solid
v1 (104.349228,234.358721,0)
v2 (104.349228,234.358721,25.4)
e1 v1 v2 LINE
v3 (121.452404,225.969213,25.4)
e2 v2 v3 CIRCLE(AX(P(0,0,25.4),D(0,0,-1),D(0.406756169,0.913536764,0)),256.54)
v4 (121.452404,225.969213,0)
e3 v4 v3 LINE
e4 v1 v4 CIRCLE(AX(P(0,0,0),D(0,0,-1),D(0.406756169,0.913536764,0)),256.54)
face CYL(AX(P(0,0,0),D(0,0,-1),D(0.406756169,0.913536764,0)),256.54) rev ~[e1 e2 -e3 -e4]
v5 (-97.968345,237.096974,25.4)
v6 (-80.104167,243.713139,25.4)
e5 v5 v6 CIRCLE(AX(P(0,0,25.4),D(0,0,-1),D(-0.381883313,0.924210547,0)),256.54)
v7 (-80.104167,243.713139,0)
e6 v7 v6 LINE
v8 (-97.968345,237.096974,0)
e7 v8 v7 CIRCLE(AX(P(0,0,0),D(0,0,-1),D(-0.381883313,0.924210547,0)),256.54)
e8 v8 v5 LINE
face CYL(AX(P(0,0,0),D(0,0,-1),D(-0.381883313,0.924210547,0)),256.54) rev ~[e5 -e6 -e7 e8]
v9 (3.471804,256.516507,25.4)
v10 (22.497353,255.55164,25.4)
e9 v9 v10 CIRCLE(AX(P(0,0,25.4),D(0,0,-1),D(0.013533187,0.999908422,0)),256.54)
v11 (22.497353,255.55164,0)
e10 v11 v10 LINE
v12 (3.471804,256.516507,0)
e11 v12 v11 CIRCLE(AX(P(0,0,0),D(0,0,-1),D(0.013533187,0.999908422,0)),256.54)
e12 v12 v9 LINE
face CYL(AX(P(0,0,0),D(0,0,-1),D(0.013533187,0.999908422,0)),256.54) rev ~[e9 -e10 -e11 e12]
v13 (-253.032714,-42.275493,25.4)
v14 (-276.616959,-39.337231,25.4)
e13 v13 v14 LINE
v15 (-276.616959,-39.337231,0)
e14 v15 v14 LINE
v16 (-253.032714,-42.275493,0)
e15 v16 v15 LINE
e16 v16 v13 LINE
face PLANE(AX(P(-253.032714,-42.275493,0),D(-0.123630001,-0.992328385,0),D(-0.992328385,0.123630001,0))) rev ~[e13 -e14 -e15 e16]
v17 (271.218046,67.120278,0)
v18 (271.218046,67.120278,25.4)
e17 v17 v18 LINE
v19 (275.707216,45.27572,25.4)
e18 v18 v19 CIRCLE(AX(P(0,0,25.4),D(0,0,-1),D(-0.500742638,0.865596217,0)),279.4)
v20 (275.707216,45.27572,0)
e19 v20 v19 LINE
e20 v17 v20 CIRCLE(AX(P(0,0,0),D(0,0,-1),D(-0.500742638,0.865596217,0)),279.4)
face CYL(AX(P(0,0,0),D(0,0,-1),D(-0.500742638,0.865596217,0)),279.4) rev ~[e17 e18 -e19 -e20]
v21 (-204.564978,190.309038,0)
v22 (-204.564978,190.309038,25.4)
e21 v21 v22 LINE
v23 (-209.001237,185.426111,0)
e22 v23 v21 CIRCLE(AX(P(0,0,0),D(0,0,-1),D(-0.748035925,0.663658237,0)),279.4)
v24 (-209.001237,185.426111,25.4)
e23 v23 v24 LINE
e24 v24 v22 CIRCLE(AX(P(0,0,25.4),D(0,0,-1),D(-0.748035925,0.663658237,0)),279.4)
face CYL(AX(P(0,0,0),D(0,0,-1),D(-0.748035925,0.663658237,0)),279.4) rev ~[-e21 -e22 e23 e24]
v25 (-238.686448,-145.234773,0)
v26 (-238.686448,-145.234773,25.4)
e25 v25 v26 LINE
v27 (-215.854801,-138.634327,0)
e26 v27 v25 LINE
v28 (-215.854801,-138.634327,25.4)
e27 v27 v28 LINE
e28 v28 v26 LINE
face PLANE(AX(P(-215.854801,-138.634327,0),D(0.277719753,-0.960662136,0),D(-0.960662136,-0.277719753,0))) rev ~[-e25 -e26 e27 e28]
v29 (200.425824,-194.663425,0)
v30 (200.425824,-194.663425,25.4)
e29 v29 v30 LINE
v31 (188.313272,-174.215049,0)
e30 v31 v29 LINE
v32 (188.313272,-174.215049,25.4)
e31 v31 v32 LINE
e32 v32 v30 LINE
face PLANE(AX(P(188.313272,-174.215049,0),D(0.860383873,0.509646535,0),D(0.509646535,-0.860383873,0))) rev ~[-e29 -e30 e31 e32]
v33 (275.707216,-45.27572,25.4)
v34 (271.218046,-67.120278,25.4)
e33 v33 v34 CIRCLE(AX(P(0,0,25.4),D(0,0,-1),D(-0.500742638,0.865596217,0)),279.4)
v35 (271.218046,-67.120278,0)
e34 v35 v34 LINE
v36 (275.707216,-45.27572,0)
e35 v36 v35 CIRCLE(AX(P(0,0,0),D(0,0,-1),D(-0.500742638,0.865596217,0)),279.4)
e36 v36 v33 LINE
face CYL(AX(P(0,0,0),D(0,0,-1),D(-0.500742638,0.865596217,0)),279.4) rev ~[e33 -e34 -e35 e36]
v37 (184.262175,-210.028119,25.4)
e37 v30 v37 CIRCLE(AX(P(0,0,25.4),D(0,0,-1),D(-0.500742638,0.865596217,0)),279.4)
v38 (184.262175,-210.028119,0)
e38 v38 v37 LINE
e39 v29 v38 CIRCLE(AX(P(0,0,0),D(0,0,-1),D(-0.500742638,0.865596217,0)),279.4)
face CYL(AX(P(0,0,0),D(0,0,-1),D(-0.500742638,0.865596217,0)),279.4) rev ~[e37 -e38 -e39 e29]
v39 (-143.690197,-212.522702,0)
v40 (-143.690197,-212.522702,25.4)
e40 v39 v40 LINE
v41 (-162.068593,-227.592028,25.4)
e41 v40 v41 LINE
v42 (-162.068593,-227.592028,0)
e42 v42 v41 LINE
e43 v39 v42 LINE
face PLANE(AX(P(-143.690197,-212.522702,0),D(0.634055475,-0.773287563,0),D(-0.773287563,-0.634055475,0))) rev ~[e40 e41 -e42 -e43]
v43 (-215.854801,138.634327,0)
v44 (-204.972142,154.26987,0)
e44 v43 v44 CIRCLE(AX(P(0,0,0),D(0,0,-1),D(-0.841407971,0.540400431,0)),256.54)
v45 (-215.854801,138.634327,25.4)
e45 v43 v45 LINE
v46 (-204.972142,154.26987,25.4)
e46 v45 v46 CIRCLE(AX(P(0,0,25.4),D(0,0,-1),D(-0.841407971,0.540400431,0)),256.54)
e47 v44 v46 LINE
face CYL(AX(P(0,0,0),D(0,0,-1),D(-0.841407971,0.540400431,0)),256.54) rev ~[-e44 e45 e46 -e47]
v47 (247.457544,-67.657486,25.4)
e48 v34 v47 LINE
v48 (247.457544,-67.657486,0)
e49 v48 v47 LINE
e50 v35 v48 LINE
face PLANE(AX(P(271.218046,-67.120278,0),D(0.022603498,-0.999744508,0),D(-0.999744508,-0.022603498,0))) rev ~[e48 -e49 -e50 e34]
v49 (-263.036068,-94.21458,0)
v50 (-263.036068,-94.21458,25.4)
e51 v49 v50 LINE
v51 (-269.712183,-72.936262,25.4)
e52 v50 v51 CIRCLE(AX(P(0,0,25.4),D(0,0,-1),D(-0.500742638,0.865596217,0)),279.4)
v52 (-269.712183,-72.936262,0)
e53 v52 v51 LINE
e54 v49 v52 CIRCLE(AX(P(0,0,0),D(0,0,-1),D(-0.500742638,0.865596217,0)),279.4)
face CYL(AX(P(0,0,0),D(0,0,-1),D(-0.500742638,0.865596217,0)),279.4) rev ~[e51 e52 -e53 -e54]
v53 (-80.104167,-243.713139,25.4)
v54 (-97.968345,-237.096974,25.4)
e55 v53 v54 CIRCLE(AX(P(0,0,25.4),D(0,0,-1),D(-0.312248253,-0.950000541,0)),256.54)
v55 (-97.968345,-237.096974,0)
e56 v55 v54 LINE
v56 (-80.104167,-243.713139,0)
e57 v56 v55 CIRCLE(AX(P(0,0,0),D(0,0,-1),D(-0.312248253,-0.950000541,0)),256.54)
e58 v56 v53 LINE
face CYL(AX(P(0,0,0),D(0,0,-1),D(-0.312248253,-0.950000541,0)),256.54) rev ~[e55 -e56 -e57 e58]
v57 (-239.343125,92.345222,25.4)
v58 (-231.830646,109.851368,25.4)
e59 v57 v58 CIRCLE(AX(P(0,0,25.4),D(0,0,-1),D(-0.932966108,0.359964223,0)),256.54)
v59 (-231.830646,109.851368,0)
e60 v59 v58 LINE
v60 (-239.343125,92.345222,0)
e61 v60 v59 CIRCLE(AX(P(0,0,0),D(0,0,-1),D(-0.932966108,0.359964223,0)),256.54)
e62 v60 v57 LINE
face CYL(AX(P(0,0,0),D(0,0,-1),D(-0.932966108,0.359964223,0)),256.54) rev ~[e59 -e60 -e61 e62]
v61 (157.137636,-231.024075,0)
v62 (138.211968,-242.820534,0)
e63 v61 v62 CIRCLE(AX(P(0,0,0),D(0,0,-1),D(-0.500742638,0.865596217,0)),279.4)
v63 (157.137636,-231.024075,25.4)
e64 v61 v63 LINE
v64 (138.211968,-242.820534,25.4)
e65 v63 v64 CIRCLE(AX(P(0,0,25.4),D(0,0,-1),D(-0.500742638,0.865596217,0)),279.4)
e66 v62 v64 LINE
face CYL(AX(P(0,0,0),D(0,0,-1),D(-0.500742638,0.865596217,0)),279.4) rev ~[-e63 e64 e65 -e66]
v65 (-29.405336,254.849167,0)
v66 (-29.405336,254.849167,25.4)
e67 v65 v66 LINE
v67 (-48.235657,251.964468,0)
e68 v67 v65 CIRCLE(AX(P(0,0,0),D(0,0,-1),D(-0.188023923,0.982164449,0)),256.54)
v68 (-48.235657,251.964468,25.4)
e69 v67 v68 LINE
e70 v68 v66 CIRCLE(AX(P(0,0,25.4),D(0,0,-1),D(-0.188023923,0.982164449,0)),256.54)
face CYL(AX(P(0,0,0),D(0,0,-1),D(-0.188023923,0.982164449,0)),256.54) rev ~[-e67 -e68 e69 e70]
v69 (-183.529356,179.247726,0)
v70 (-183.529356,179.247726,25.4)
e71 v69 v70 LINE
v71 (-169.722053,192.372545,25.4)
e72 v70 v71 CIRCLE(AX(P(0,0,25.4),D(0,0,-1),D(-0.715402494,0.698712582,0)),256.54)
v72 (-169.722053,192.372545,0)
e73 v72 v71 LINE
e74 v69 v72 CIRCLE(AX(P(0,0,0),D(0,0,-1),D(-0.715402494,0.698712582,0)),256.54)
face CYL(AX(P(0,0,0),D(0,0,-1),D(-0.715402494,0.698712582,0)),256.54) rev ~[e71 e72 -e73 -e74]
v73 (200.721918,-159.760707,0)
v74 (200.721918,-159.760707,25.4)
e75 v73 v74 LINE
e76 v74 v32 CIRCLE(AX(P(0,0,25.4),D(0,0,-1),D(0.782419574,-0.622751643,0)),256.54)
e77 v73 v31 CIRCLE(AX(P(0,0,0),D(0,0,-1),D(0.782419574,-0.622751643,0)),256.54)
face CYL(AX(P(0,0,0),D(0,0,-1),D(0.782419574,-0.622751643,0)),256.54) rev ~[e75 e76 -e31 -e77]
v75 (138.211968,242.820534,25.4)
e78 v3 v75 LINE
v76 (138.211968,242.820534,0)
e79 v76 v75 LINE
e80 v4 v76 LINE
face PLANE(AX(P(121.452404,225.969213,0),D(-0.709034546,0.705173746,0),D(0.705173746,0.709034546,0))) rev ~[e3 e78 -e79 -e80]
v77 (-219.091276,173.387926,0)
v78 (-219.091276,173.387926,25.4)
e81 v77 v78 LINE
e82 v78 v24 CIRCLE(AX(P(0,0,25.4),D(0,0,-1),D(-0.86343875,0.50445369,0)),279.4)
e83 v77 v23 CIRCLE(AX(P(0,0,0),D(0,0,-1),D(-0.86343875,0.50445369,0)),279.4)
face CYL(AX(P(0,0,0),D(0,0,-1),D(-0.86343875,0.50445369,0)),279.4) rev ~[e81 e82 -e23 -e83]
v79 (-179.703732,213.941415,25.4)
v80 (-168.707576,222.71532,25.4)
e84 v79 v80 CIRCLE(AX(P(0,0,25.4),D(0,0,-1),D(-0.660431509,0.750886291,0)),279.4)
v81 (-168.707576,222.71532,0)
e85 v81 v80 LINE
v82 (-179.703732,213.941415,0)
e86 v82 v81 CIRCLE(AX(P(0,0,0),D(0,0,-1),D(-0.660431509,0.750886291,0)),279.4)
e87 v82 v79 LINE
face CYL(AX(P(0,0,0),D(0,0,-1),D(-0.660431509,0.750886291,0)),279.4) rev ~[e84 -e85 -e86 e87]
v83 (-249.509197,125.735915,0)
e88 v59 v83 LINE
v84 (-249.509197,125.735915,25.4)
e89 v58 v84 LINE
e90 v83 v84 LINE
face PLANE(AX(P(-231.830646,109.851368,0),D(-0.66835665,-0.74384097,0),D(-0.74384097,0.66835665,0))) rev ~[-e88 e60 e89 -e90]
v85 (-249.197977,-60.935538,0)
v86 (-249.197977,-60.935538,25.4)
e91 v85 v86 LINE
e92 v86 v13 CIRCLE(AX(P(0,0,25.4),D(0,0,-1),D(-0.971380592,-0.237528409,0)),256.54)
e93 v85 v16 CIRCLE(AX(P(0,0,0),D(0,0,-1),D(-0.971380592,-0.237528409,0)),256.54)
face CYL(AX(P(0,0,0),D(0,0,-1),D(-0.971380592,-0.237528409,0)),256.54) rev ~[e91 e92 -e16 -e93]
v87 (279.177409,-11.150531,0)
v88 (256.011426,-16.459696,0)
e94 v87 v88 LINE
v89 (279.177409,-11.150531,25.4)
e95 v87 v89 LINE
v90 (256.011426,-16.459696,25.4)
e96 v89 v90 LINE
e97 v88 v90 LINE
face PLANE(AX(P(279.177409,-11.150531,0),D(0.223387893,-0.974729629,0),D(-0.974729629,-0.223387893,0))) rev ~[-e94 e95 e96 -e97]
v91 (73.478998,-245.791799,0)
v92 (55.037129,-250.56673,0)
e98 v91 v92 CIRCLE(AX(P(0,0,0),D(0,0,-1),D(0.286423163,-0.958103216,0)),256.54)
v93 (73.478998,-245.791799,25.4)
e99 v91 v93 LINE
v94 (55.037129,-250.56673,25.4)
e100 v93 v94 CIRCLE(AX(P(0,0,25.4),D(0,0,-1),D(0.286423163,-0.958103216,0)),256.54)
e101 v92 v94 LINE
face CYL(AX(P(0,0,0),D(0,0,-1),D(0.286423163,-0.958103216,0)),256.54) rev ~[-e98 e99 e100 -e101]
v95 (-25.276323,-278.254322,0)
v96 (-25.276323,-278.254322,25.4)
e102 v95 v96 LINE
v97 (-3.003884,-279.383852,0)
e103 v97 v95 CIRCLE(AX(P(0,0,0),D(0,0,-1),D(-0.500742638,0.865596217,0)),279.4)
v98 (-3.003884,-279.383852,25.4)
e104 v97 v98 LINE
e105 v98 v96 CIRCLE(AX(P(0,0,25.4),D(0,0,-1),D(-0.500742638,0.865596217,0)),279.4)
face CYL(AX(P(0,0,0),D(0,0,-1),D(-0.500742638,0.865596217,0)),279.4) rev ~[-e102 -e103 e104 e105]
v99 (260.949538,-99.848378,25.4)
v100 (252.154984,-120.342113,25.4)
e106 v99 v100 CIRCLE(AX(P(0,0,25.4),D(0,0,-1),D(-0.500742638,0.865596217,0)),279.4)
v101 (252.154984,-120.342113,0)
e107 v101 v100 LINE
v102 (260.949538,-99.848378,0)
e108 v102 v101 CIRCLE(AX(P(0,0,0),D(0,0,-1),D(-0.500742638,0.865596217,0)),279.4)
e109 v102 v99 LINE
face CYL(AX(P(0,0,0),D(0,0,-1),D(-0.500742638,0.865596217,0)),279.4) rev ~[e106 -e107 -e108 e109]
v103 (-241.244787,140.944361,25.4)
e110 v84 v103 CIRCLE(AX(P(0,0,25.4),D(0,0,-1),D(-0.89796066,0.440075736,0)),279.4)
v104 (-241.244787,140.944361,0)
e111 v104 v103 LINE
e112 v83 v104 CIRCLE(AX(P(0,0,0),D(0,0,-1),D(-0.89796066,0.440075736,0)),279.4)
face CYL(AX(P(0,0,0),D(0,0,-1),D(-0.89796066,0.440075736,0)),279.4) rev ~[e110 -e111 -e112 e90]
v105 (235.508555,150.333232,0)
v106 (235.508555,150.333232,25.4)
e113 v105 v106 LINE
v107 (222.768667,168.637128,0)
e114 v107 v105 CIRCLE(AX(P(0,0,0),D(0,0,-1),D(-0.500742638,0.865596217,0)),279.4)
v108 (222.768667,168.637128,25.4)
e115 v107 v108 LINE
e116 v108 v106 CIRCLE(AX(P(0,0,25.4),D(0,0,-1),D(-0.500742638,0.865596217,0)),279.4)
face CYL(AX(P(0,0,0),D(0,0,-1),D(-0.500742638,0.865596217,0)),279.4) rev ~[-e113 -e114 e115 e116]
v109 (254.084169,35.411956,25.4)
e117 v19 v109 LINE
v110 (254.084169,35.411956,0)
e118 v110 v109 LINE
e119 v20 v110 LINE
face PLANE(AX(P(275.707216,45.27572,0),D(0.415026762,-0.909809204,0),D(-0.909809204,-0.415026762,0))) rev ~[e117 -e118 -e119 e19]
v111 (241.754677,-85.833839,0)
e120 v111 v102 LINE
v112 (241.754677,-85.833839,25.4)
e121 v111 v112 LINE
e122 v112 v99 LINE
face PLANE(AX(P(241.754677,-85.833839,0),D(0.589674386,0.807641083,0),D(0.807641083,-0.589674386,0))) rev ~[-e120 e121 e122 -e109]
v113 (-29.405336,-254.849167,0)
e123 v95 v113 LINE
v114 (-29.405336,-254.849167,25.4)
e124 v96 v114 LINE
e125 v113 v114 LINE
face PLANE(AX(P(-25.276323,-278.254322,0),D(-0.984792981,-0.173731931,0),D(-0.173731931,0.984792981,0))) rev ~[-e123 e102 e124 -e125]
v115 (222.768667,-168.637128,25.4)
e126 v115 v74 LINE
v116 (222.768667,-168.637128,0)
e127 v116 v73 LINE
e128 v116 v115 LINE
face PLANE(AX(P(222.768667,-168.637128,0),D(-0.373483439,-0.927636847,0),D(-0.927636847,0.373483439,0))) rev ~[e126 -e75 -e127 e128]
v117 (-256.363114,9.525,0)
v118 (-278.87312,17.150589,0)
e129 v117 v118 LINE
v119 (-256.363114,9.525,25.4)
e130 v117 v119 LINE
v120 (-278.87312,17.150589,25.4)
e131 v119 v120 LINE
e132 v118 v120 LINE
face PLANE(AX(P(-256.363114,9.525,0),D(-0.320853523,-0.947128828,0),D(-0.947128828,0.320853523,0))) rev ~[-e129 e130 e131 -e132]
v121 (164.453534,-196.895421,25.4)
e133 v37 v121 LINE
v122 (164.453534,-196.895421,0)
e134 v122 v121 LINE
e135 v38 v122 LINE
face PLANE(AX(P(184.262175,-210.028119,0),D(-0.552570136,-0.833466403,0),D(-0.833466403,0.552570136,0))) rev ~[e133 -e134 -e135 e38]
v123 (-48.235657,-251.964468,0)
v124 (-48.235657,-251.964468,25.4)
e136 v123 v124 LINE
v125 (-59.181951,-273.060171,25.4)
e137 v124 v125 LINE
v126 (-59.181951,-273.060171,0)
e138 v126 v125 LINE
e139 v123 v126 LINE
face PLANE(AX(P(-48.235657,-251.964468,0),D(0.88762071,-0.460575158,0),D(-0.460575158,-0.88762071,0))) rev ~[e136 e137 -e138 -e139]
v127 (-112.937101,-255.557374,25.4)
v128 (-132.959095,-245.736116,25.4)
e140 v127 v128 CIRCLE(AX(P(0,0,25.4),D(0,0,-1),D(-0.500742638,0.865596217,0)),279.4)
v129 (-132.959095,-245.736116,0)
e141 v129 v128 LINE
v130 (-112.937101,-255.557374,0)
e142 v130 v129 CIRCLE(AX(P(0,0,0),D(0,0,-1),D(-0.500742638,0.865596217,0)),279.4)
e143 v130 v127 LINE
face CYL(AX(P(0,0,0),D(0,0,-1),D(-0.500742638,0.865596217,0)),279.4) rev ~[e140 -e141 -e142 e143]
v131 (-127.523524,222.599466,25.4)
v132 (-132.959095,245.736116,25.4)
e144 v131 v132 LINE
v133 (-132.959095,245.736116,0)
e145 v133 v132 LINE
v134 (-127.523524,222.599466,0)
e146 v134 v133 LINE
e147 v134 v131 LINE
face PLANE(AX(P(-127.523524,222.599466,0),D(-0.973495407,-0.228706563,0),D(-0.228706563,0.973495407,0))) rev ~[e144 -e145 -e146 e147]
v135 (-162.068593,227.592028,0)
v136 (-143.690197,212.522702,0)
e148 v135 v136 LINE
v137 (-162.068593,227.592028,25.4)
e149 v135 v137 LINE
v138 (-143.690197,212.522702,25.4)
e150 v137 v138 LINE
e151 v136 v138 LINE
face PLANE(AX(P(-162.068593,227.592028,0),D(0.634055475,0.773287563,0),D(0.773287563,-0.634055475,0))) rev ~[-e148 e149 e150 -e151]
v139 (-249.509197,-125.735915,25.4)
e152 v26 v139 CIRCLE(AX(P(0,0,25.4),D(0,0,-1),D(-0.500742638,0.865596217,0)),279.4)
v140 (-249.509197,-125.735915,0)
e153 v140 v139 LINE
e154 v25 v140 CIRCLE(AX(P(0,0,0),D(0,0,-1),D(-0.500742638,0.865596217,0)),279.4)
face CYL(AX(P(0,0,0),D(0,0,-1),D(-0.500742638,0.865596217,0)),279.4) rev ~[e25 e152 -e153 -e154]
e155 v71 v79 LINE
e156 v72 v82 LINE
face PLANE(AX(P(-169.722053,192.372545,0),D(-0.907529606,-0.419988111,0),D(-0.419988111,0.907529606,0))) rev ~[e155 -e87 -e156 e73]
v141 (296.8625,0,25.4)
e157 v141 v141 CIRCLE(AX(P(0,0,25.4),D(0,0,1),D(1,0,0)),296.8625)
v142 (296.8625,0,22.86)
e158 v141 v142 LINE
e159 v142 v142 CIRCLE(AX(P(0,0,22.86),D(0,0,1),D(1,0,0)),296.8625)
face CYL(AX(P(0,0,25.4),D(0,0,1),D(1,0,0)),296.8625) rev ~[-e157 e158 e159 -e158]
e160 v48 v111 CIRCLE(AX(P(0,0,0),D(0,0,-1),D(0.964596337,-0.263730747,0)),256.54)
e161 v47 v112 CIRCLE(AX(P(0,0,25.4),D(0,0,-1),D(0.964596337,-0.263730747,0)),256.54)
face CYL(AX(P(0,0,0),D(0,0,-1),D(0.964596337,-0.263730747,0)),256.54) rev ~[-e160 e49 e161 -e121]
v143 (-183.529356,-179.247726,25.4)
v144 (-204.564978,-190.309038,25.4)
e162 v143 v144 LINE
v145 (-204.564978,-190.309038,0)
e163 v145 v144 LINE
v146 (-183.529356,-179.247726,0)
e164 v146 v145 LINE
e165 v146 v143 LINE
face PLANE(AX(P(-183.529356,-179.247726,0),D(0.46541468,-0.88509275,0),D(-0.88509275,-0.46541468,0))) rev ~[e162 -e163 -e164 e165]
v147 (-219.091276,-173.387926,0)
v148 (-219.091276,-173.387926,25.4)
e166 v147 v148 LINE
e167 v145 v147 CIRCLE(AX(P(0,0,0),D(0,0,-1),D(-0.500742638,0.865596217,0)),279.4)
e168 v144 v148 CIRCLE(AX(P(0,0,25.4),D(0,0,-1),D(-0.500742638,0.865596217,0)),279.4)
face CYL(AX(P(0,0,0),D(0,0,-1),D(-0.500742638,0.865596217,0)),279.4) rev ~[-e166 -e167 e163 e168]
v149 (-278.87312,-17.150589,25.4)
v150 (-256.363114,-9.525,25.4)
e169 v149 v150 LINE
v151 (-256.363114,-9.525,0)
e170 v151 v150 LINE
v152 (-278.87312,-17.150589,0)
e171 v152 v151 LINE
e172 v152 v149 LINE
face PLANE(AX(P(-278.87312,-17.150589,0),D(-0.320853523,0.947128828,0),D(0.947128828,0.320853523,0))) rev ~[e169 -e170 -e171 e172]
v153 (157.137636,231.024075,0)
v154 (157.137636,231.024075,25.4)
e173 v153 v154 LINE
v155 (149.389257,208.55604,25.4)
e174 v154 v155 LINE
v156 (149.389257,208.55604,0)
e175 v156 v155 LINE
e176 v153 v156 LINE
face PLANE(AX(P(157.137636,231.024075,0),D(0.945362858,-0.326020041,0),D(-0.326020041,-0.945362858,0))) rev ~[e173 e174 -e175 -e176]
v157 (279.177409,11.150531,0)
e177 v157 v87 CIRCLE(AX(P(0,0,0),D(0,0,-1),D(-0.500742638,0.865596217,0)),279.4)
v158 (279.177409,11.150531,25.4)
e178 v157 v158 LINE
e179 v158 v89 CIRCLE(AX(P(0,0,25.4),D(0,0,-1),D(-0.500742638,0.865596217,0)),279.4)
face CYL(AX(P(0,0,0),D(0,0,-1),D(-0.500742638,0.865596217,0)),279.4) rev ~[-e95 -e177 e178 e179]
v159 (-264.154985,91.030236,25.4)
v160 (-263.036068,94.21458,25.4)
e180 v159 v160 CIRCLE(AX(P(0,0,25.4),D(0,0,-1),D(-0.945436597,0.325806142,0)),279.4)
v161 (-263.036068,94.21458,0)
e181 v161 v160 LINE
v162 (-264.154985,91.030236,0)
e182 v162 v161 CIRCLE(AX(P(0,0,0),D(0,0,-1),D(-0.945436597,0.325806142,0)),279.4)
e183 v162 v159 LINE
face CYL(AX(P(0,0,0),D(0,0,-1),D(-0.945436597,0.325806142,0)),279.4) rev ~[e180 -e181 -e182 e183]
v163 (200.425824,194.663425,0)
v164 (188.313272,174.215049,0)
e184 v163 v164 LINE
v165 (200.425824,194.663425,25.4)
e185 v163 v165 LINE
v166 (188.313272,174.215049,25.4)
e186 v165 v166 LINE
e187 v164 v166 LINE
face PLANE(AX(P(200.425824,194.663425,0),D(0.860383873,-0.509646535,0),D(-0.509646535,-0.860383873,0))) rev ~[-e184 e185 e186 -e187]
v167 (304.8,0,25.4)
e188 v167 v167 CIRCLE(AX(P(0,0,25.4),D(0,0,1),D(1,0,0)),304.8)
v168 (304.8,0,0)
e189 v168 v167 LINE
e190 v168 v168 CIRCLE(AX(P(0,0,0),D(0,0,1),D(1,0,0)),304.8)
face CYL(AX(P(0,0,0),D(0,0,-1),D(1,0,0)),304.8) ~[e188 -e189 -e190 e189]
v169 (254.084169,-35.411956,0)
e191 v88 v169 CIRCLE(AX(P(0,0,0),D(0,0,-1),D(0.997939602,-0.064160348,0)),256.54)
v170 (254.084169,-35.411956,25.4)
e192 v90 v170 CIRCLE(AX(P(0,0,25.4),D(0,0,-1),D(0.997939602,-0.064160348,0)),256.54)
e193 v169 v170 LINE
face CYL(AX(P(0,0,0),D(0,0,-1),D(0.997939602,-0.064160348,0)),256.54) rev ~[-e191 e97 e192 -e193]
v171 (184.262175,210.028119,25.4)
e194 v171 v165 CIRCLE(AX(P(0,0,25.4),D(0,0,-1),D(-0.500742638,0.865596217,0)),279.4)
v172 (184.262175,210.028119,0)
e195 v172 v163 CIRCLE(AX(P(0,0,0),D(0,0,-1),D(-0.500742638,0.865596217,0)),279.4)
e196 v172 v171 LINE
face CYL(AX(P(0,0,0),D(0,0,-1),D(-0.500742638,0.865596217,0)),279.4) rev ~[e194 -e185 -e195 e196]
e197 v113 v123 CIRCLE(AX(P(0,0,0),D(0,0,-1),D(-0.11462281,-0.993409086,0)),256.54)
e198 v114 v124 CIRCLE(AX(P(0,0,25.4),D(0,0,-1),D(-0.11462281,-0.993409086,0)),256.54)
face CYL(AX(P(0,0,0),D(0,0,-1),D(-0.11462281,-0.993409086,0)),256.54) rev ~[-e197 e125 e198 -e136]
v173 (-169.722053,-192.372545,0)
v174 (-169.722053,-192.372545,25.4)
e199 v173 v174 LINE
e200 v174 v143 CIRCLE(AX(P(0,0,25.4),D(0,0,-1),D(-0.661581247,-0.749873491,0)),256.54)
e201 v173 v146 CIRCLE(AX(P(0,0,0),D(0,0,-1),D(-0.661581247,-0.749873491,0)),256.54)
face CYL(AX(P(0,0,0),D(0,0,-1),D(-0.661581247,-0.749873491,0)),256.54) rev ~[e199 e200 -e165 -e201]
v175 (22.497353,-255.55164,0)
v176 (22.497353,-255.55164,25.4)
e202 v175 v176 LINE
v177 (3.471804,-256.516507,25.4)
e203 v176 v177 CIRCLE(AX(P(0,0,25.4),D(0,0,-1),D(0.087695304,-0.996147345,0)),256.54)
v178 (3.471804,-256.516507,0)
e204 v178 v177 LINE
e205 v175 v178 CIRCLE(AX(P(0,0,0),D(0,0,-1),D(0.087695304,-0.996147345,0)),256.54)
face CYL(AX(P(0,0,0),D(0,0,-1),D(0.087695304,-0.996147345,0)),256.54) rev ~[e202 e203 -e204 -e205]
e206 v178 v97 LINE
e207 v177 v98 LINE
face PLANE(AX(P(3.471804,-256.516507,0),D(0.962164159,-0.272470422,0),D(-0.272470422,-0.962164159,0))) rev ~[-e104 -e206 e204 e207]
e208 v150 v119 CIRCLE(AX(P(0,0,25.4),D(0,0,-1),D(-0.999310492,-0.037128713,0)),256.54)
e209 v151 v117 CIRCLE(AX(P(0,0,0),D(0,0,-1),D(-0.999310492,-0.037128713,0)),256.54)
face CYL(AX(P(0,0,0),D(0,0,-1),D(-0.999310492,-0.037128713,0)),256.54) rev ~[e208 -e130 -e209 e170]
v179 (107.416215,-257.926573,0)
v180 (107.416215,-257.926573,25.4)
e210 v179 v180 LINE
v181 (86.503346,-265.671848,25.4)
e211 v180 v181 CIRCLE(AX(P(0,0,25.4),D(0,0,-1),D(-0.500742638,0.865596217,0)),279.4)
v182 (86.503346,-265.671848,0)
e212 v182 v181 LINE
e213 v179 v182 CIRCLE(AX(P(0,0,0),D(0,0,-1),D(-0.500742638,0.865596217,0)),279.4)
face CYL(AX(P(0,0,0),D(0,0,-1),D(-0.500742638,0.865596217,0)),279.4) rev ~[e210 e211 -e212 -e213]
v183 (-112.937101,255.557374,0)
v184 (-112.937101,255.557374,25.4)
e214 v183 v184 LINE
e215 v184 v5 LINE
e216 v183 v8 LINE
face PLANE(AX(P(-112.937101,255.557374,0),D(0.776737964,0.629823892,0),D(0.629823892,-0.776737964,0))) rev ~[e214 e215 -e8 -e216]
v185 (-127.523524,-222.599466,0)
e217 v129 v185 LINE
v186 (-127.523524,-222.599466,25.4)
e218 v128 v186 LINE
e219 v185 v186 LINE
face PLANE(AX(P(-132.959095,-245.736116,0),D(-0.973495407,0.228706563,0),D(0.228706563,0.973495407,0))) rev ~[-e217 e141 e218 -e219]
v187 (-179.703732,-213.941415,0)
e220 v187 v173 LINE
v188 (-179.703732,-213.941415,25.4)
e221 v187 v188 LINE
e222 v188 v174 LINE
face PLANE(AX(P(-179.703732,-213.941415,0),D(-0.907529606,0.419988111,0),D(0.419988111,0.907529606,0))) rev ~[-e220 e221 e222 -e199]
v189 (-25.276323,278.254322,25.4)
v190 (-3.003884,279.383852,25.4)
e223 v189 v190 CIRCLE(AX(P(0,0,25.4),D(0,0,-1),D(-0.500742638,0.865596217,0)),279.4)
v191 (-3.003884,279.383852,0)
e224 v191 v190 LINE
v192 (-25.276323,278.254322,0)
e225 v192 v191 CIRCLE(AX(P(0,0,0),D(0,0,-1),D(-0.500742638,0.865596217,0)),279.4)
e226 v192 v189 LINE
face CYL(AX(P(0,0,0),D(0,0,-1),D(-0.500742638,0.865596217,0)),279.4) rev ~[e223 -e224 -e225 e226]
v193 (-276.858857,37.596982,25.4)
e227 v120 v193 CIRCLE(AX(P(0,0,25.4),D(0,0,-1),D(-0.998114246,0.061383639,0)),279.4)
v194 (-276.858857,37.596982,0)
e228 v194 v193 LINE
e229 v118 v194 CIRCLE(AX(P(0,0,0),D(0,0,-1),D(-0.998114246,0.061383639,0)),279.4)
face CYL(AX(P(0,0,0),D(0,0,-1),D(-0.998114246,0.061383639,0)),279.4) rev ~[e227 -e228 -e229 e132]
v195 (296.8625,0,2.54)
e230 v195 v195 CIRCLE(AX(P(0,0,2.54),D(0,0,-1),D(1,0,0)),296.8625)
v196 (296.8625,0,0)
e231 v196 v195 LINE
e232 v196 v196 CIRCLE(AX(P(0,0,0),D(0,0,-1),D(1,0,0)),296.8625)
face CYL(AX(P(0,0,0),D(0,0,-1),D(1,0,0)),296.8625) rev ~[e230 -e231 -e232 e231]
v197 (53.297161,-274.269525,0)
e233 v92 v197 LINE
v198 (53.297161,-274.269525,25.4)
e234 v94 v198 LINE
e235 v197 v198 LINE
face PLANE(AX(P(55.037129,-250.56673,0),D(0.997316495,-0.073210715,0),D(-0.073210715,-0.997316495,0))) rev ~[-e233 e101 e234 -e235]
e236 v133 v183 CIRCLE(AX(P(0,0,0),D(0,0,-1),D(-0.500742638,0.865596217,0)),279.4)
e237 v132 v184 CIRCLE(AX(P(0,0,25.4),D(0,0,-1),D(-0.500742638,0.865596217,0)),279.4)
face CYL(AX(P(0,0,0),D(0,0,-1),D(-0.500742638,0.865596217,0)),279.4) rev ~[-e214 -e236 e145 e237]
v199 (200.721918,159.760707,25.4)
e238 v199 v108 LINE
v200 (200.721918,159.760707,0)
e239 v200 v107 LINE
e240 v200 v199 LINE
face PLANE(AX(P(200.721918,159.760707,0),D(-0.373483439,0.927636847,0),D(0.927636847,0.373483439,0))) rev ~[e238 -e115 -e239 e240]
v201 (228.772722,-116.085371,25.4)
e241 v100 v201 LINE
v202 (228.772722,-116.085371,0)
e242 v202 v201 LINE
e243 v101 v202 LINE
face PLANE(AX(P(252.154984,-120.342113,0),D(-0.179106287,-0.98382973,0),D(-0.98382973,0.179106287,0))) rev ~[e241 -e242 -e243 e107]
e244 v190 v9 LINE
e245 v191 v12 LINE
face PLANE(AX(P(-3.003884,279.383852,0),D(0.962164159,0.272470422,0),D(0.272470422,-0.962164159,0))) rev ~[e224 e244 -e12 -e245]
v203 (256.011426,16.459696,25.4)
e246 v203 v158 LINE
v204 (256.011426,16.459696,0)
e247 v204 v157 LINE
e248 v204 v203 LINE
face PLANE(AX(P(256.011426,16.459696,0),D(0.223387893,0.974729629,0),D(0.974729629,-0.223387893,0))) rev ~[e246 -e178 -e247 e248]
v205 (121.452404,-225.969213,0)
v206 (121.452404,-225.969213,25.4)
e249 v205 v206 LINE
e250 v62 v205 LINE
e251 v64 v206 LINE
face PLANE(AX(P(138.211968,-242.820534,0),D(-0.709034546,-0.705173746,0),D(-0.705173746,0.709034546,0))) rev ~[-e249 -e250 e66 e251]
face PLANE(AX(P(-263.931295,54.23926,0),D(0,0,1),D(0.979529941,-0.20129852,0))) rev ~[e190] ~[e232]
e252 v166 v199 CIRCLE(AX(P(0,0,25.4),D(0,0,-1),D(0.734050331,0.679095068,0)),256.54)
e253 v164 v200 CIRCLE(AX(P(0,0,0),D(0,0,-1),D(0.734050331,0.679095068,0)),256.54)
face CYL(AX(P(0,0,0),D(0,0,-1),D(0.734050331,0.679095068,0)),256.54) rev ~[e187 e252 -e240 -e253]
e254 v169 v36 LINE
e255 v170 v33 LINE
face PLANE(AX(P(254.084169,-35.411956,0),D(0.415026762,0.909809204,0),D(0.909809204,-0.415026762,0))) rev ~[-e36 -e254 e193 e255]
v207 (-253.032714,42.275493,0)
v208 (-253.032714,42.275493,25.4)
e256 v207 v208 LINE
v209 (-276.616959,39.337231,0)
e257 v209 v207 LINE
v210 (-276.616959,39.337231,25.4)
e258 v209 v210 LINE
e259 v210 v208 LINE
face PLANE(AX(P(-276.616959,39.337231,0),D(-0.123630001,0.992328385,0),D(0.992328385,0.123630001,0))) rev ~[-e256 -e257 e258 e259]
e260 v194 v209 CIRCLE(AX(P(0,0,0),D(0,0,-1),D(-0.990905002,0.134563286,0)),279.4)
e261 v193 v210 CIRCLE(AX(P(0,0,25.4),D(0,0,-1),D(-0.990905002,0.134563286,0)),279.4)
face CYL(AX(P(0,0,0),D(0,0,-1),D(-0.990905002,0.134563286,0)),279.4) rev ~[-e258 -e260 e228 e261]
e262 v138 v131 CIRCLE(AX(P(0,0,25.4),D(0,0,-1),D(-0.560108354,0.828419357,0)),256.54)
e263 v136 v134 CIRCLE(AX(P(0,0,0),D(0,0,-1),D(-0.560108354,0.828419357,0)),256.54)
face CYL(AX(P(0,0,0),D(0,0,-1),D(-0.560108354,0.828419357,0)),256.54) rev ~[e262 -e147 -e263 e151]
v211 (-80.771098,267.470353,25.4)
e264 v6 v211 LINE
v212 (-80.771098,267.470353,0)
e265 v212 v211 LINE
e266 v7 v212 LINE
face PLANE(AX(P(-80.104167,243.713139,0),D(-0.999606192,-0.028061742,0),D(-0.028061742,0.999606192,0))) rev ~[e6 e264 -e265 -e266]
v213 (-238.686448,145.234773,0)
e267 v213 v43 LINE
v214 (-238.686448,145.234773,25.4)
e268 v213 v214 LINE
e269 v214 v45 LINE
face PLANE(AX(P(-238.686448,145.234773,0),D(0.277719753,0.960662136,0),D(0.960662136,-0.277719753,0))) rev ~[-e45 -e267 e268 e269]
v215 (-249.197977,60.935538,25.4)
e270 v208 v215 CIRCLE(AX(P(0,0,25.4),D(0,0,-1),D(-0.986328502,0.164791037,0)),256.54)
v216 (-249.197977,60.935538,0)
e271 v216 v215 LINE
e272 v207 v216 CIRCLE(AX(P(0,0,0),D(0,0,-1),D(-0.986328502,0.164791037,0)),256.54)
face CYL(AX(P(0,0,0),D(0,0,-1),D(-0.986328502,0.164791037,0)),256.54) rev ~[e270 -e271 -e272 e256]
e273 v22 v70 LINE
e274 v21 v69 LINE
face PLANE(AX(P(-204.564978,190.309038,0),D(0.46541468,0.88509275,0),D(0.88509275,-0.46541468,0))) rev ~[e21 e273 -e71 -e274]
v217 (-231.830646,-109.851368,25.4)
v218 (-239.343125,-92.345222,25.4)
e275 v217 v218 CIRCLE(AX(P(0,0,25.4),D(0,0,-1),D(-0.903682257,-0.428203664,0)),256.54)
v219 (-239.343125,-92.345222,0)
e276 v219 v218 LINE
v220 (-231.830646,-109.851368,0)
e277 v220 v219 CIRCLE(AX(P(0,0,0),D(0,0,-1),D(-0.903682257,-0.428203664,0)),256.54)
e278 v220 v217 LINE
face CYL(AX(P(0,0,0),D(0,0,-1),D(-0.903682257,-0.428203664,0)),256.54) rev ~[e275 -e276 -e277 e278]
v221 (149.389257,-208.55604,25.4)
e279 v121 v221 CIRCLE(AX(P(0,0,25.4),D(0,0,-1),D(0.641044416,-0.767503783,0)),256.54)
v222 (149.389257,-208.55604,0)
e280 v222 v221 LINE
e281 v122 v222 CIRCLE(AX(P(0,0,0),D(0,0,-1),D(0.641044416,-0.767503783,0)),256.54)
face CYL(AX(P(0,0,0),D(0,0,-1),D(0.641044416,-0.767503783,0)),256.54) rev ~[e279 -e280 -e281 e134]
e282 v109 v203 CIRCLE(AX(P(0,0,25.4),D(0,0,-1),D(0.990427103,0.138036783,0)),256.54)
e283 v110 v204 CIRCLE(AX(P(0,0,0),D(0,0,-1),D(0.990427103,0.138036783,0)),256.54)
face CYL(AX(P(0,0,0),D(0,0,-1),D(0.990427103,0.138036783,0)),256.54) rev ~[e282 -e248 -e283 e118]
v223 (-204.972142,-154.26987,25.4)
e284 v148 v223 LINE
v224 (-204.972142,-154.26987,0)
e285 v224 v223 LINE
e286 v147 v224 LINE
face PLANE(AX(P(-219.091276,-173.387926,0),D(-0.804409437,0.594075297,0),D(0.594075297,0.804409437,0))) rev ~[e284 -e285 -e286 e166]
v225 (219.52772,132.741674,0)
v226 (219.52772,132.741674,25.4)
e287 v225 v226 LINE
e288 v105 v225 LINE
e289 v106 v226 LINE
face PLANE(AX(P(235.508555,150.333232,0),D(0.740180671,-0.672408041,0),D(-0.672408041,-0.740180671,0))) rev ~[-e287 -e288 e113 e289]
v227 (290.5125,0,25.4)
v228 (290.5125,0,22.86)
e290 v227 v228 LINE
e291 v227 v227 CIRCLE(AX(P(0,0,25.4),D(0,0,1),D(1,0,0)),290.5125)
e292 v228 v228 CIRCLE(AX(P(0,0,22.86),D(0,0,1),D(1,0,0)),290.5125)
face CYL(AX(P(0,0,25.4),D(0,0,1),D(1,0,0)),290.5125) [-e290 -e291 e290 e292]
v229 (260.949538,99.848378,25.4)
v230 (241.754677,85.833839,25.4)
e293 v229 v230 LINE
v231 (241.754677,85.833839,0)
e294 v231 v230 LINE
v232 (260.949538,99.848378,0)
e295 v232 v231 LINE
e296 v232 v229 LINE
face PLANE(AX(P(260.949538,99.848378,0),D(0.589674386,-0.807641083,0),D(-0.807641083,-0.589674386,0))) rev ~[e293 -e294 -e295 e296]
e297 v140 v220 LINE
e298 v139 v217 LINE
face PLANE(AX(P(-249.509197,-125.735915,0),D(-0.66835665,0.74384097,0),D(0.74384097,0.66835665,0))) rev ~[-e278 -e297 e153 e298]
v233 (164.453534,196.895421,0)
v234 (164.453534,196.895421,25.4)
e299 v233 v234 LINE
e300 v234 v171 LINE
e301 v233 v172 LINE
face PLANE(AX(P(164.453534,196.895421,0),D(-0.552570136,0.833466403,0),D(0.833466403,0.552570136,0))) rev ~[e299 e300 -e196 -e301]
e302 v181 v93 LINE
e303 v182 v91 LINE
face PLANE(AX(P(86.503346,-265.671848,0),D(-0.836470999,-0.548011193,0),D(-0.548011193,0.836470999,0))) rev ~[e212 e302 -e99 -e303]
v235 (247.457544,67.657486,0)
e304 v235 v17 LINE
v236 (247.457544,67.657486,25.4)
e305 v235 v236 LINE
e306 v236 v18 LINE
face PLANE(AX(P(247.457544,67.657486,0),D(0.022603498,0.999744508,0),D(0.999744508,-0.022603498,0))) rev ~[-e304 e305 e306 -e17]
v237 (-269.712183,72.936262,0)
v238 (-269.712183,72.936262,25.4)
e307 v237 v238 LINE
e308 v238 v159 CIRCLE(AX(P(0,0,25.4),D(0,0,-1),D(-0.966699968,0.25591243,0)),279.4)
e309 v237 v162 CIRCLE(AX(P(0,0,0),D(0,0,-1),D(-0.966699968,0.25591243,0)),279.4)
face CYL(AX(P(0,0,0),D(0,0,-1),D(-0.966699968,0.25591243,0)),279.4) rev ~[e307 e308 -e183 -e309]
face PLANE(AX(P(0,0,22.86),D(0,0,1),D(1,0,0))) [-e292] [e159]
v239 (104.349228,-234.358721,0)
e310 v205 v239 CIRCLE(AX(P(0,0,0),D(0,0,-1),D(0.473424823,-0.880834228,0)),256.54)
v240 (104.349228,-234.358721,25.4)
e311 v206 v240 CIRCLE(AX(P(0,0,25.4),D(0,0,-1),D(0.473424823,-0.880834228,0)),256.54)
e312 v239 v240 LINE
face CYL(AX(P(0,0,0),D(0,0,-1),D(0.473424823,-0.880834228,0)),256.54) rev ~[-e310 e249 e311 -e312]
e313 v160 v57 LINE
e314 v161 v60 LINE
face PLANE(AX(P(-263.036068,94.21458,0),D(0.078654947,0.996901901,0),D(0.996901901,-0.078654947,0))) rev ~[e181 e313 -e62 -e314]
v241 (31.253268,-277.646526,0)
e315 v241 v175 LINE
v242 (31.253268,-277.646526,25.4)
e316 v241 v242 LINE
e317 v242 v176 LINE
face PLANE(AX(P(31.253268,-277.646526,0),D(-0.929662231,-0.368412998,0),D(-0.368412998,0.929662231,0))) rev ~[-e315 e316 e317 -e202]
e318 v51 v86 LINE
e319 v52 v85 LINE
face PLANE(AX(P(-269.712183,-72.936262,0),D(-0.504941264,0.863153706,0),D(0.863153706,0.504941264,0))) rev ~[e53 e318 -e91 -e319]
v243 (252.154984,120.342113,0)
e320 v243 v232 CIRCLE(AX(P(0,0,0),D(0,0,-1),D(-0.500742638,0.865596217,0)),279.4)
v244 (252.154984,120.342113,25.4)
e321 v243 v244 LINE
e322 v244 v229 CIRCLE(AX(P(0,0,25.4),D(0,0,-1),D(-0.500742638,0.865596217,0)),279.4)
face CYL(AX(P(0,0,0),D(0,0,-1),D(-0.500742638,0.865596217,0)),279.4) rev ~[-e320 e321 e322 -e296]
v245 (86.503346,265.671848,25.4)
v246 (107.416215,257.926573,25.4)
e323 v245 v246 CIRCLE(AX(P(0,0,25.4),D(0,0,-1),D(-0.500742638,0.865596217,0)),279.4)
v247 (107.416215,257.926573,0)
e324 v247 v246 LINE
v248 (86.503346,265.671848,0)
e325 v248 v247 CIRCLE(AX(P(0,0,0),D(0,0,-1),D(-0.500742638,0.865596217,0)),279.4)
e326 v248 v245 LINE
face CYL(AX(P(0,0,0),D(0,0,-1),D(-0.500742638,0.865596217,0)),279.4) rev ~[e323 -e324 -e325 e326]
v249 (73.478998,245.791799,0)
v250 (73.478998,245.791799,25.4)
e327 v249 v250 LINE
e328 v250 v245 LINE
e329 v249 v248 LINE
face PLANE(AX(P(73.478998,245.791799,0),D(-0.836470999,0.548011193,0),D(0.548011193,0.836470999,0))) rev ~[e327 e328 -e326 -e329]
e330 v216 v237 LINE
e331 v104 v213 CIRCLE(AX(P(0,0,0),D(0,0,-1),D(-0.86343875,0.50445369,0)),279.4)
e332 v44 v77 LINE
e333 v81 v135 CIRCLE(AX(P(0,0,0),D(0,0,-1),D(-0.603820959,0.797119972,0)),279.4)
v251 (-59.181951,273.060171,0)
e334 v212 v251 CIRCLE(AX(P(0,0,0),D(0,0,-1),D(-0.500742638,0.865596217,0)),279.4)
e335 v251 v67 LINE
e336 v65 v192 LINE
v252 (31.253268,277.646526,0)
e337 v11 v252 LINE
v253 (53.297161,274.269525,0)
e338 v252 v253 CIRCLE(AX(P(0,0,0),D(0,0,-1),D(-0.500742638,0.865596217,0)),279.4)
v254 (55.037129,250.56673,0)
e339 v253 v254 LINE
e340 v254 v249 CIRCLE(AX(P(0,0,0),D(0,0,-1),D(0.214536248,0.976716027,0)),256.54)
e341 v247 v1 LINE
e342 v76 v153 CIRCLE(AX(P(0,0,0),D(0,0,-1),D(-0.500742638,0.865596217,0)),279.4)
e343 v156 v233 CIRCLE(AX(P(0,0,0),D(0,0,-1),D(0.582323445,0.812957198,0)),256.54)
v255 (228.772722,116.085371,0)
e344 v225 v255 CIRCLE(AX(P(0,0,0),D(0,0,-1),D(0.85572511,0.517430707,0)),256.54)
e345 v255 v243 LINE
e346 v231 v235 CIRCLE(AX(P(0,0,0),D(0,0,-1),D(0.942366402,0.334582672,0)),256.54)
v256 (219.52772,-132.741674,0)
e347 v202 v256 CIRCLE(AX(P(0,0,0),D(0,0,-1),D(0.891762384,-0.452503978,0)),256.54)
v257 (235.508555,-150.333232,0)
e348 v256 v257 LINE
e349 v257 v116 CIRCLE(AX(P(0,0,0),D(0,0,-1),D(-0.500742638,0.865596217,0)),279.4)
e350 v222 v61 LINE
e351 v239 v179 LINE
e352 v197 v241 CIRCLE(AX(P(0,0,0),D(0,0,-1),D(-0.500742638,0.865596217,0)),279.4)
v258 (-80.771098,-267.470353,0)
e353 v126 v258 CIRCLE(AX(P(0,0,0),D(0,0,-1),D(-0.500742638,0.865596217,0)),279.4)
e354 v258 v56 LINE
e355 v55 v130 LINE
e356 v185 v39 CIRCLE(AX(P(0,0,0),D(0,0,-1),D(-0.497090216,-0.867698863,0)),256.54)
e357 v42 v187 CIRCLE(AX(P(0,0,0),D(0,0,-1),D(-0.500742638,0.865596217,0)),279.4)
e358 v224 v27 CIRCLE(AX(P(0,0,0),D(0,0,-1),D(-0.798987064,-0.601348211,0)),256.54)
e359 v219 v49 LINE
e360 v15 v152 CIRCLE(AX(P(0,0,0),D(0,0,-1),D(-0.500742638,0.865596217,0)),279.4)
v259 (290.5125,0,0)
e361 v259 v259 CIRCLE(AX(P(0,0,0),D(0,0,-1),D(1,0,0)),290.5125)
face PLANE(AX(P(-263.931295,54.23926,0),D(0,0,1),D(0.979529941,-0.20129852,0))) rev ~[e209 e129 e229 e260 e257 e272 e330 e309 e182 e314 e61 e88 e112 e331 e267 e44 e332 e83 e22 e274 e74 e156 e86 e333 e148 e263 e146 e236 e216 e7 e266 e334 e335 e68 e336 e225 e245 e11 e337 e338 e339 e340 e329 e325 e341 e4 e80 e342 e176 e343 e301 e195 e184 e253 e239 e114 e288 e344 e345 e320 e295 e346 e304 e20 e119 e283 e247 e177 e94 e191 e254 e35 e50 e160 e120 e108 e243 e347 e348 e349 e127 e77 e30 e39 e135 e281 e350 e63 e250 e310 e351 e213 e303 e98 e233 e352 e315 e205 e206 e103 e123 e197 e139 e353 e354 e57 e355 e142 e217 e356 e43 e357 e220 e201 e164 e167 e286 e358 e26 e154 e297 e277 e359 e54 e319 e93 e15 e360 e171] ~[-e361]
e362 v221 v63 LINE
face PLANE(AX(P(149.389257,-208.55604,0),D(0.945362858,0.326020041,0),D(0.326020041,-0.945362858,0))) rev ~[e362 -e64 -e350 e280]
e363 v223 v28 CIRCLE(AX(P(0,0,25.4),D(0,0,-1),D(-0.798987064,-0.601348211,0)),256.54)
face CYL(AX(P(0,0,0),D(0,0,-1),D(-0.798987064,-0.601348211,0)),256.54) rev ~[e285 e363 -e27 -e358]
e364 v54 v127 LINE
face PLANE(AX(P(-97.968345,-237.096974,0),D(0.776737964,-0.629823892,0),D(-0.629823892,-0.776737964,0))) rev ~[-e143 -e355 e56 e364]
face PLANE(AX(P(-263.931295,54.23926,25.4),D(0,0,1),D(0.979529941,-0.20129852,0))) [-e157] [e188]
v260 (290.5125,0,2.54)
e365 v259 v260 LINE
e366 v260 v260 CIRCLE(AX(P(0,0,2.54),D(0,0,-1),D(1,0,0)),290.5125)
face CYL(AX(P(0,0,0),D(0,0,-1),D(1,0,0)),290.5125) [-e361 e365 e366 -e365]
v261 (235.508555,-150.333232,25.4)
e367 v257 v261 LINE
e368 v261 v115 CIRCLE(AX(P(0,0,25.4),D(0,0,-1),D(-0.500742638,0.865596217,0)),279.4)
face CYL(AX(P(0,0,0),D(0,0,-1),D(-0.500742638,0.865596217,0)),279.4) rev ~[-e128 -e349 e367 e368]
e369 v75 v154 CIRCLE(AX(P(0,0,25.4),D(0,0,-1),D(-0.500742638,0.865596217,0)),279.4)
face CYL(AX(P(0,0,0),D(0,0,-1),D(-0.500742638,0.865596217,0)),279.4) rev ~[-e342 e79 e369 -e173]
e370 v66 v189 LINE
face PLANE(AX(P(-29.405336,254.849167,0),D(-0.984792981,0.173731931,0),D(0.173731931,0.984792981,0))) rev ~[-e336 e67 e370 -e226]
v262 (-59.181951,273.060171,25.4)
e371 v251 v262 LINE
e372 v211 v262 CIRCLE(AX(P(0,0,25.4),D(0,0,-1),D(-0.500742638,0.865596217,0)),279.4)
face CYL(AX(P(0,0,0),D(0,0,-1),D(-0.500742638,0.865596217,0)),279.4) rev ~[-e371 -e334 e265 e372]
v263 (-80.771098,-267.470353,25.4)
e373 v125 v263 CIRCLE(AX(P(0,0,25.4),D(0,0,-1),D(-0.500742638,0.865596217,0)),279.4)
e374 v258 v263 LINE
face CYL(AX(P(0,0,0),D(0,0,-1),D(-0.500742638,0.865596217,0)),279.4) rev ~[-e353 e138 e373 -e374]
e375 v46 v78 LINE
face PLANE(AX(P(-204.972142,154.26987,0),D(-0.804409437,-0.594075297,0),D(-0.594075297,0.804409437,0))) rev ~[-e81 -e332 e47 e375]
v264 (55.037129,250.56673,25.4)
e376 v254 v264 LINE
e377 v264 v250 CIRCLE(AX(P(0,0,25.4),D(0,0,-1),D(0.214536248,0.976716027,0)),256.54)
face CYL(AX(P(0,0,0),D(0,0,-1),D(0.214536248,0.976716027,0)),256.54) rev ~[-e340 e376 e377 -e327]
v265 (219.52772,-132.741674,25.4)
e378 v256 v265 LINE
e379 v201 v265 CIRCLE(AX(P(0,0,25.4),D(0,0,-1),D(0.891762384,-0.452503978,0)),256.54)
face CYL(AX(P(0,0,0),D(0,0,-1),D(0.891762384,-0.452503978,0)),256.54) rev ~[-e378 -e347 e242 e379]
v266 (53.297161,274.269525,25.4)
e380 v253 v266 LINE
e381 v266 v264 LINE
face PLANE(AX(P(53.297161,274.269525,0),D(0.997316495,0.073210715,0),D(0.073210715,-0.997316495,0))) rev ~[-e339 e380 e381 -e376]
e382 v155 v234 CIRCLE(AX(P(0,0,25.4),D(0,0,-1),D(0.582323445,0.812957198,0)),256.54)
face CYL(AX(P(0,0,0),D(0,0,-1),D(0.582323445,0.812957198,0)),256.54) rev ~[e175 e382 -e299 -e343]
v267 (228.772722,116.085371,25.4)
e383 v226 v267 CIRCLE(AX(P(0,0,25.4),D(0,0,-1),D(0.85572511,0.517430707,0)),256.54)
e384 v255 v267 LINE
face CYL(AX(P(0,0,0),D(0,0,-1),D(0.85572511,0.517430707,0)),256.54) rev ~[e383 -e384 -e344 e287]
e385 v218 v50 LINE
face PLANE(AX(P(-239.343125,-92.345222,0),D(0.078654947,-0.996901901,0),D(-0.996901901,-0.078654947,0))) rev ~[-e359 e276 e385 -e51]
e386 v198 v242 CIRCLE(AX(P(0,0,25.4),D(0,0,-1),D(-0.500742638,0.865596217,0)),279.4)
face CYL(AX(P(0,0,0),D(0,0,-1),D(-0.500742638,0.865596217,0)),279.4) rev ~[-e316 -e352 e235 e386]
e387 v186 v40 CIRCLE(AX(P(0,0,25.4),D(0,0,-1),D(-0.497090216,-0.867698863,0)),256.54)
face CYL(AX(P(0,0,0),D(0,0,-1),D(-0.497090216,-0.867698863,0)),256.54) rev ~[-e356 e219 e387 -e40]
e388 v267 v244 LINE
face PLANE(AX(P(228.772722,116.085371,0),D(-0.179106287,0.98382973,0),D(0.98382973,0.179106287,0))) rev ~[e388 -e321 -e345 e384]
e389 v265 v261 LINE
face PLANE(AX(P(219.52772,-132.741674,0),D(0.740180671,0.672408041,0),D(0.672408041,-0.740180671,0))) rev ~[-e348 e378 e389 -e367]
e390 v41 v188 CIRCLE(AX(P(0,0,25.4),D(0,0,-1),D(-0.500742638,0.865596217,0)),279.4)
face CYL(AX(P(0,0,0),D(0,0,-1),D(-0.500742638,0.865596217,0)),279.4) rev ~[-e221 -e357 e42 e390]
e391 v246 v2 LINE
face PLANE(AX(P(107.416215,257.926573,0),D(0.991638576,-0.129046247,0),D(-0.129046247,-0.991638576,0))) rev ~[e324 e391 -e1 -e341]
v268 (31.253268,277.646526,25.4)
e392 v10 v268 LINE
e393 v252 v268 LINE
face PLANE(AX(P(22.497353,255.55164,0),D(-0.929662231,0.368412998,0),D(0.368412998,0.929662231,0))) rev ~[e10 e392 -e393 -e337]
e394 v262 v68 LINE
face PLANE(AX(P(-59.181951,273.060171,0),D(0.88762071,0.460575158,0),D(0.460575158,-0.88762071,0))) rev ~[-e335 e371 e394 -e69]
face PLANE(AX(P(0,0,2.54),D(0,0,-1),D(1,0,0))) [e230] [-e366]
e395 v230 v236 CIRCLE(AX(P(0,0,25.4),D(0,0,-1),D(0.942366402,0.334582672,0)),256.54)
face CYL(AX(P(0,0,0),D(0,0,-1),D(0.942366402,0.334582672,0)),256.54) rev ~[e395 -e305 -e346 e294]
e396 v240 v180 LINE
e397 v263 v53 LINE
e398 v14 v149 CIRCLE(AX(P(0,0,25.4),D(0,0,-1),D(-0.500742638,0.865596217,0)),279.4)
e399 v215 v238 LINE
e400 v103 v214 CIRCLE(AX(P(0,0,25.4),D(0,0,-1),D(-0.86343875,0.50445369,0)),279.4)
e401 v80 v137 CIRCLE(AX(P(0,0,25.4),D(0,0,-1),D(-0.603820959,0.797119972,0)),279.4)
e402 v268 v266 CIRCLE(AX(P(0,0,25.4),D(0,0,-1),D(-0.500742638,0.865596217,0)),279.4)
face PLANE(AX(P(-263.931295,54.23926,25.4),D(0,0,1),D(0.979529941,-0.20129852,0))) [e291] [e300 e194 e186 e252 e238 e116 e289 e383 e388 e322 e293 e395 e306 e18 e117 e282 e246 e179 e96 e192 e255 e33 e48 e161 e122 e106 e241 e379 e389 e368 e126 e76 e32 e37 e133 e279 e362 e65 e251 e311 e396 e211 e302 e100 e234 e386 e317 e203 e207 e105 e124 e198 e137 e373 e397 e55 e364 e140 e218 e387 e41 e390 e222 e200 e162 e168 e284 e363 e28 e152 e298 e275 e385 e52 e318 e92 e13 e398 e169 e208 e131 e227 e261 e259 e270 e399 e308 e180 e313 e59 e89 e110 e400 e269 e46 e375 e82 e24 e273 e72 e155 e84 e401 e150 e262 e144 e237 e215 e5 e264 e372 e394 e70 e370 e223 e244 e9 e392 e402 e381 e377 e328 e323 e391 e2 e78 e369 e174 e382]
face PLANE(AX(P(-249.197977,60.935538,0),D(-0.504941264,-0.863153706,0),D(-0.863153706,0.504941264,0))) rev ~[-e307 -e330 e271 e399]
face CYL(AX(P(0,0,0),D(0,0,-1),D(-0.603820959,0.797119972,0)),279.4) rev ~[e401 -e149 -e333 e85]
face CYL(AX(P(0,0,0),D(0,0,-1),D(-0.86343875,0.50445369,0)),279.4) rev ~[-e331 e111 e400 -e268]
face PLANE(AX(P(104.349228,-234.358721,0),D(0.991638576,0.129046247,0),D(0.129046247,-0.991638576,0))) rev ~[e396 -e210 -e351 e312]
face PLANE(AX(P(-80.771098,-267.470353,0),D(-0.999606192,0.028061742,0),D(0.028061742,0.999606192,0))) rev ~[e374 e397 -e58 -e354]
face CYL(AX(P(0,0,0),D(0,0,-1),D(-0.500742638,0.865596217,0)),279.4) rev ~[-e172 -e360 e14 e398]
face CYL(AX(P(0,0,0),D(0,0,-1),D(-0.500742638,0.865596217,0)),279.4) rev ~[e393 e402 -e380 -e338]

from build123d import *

# Parameters (mm, degrees)
F0_R            = 304.8
F1_DEPTH        = 25.4
F2_DEPTH        = 25.4
F2_COPIES_COUNT = 31
F3_R            = 296.8625
F3_R_2          = 290.5125
F4_DEPTH        = 2.54
F5_R            = 296.8625
F5_R_2          = 290.5125
F6_DEPTH        = 2.54


# Not quite as in the source:
# - a pattern or mirror of a feature is missing from the dataset's text; its kind, count and spacing are read off the source's solid


with BuildPart() as f1:
    # F0 (on Top) → F1 (new body)
    with BuildSketch(Plane.XY):
        Circle(F0_R)
        with BuildLine():
            ThreePointArc((-139.9074929569, 241.8475830239), (139.5962149699, 242.0273884627), (279.4, 0))
            ThreePointArc((279.4, 0), (8.5793400064, -279.2682490457), (-278.873120437, -17.1505888444))
            Line((-278.873120437, -17.1505888444), (-284.48, -19.05))
            Line((-284.48, -19.05), (-284.48, 19.05))
            Line((-284.48, 19.05), (-278.873120437, 17.1505888444))
            ThreePointArc((-278.873120437, 17.1505888444), (-278.0539903617, 27.392306291), (-276.8588574341, 37.5969820635))
            Line((-276.8588574341, 37.5969820635), (-282.7052908844, 36.7727961626))
            Line((-282.7052908844, 36.7727961626), (-275.2642057328, 74.52500298))
            Line((-275.2642057328, 74.52500298), (-270.0959710932, 71.5019328355))
            ThreePointArc((-270.0959710932, 71.5019328355), (-267.303871456, 81.3203560288), (-264.1549850662, 91.0302359916))
            Line((-264.1549850662, 91.0302359916), (-270.1311147854, 91.3975495928))
            Line((-270.1311147854, 91.3975495928), (-255.2871620754, 126.8976403584))
            Line((-255.2871620754, 126.8976403584), (-250.8902083052, 122.9571607373))
            ThreePointArc((-250.8902083052, 122.9571607373), (-246.2317976323, 132.0388648646), (-241.2447866782, 140.9443610102))
            Line((-241.2447866782, 140.9443610102), (-247.0326592074, 142.4729997596))
            Line((-247.0326592074, 142.4729997596), (-225.5328396666, 174.384889715))
            Line((-225.5328396666, 174.384889715), (-221.9907783353, 169.6598194449))
            ThreePointArc((-221.9907783353, 169.6598194449), (-215.6401479473, 177.6617195494), (-209.0012374477, 185.4261112825))
            Line((-209.0012374477, 185.4261112825), (-214.453995901, 188.1291797331))
            Line((-214.453995901, 188.1291797331), (-187.0092810122, 215.058314286))
            Line((-187.0092810122, 215.058314286), (-184.5245635336, 209.7976297595))
            ThreePointArc((-184.5245635336, 209.7976297595), (-176.734130204, 216.4010333179), (-168.7075759898, 222.715320092))
            Line((-168.7075759898, 222.715320092), (-173.4326522734, 226.2997079893))
            Line((-173.4326522734, 226.2997079893), (-141.3964217588, 247.6183643131))
            Line((-141.3964217588, 247.6183643131), (-139.9074929569, 241.8475830239))
        make_face(mode=Mode.SUBTRACT)
        with BuildLine():
            ThreePointArc((-241.2447866782, 140.9443610102), (-232.0623656728, 155.6001877838), (-221.9907783353, 169.6598194449))
            Line((-221.9907783353, 169.6598194449), (-225.5328396666, 174.384889715))
            Line((-225.5328396666, 174.384889715), (-247.0326592074, 142.4729997596))
            Line((-247.0326592074, 142.4729997596), (-241.2447866782, 140.9443610102))
        make_face()
        with BuildLine():
            ThreePointArc((-209.0012374477, 185.4261112825), (-197.1398786083, 197.9904751807), (-184.5245635336, 209.7976297595))
            Line((-184.5245635336, 209.7976297595), (-187.0092810122, 215.058314286))
            Line((-187.0092810122, 215.058314286), (-214.453995901, 188.1291797331))
            Line((-214.453995901, 188.1291797331), (-209.0012374477, 185.4261112825))
        make_face()
        with BuildLine():
            ThreePointArc((-168.7075759898, 222.715320092), (-154.603771191, 232.7273811427), (-139.9074929569, 241.8475830239))
            Line((-139.9074929569, 241.8475830239), (-141.3964217588, 247.6183643131))
            Line((-141.3964217588, 247.6183643131), (-173.4326522734, 226.2997079893))
            Line((-173.4326522734, 226.2997079893), (-168.7075759898, 222.715320092))
        make_face()
        with BuildLine():
            Line((-270.1311147854, 91.3975495928), (-264.1549850662, 91.0302359916))
            ThreePointArc((-264.1549850662, 91.0302359916), (-258.0168985448, 107.1990674648), (-250.8902083052, 122.9571607373))
            Line((-250.8902083052, 122.9571607373), (-255.2871620754, 126.8976403584))
            Line((-255.2871620754, 126.8976403584), (-270.1311147854, 91.3975495928))
        make_face()
        with BuildLine():
            Line((-282.7052908844, 36.7727961626), (-276.8588574341, 37.5969820635))
            ThreePointArc((-276.8588574341, 37.5969820635), (-274.0023403806, 54.6541623845), (-270.0959710932, 71.5019328355))
            Line((-270.0959710932, 71.5019328355), (-275.2642057328, 74.52500298))
            Line((-275.2642057328, 74.52500298), (-282.7052908844, 36.7727961626))
        make_face()
        with BuildLine():
            Line((-284.48, -19.05), (-278.873120437, -17.1505888444))
            ThreePointArc((-278.873120437, -17.1505888444), (-279.4, 0), (-278.873120437, 17.1505888444))
            Line((-278.873120437, 17.1505888444), (-284.48, 19.05))
            Line((-284.48, 19.05), (-284.48, -19.05))
        make_face()
    extrude(amount=F1_DEPTH)

    # F0 (on Top) → F2 (join)
    with BuildSketch(Plane.XY):
        with BuildLine():
            ThreePointArc((-278.873120437, 17.1505888444), (-279.4, 0), (-278.873120437, -17.1505888444))
            Line((-278.873120437, -17.1505888444), (-256.3631135226, -9.525))
            ThreePointArc((-256.3631135226, -9.525), (-256.54, 0), (-256.3631135226, 9.525))
            Line((-256.3631135226, 9.525), (-278.873120437, 17.1505888444))
        make_face()
    f2 = extrude(amount=F2_DEPTH)

    # F2_copies: F2 ×31 about axis
    f2_copies_axis = Axis((0, 0, 0), (0, 0, 1))
    for i in range(1, F2_COPIES_COUNT):
        add(f2.rotate(f2_copies_axis, i * 360 / F2_COPIES_COUNT))

    # F3 (on face) → F4 (cut)
    with BuildSketch(Plane(origin=(0, 0, 0), x_dir=(1, 0, 0), z_dir=(0, 0, -1))):
        Circle(F3_R)
        Circle(F3_R_2, mode=Mode.SUBTRACT)
    extrude(amount=-F4_DEPTH, mode=Mode.SUBTRACT)

    # F5 (on face) → F6 (cut)
    with BuildSketch(Plane.XY.offset(25.4)):
        Circle(F5_R)
        Circle(F5_R_2, mode=Mode.SUBTRACT)
    extrude(amount=-F6_DEPTH, mode=Mode.SUBTRACT)


solid = f1.part
